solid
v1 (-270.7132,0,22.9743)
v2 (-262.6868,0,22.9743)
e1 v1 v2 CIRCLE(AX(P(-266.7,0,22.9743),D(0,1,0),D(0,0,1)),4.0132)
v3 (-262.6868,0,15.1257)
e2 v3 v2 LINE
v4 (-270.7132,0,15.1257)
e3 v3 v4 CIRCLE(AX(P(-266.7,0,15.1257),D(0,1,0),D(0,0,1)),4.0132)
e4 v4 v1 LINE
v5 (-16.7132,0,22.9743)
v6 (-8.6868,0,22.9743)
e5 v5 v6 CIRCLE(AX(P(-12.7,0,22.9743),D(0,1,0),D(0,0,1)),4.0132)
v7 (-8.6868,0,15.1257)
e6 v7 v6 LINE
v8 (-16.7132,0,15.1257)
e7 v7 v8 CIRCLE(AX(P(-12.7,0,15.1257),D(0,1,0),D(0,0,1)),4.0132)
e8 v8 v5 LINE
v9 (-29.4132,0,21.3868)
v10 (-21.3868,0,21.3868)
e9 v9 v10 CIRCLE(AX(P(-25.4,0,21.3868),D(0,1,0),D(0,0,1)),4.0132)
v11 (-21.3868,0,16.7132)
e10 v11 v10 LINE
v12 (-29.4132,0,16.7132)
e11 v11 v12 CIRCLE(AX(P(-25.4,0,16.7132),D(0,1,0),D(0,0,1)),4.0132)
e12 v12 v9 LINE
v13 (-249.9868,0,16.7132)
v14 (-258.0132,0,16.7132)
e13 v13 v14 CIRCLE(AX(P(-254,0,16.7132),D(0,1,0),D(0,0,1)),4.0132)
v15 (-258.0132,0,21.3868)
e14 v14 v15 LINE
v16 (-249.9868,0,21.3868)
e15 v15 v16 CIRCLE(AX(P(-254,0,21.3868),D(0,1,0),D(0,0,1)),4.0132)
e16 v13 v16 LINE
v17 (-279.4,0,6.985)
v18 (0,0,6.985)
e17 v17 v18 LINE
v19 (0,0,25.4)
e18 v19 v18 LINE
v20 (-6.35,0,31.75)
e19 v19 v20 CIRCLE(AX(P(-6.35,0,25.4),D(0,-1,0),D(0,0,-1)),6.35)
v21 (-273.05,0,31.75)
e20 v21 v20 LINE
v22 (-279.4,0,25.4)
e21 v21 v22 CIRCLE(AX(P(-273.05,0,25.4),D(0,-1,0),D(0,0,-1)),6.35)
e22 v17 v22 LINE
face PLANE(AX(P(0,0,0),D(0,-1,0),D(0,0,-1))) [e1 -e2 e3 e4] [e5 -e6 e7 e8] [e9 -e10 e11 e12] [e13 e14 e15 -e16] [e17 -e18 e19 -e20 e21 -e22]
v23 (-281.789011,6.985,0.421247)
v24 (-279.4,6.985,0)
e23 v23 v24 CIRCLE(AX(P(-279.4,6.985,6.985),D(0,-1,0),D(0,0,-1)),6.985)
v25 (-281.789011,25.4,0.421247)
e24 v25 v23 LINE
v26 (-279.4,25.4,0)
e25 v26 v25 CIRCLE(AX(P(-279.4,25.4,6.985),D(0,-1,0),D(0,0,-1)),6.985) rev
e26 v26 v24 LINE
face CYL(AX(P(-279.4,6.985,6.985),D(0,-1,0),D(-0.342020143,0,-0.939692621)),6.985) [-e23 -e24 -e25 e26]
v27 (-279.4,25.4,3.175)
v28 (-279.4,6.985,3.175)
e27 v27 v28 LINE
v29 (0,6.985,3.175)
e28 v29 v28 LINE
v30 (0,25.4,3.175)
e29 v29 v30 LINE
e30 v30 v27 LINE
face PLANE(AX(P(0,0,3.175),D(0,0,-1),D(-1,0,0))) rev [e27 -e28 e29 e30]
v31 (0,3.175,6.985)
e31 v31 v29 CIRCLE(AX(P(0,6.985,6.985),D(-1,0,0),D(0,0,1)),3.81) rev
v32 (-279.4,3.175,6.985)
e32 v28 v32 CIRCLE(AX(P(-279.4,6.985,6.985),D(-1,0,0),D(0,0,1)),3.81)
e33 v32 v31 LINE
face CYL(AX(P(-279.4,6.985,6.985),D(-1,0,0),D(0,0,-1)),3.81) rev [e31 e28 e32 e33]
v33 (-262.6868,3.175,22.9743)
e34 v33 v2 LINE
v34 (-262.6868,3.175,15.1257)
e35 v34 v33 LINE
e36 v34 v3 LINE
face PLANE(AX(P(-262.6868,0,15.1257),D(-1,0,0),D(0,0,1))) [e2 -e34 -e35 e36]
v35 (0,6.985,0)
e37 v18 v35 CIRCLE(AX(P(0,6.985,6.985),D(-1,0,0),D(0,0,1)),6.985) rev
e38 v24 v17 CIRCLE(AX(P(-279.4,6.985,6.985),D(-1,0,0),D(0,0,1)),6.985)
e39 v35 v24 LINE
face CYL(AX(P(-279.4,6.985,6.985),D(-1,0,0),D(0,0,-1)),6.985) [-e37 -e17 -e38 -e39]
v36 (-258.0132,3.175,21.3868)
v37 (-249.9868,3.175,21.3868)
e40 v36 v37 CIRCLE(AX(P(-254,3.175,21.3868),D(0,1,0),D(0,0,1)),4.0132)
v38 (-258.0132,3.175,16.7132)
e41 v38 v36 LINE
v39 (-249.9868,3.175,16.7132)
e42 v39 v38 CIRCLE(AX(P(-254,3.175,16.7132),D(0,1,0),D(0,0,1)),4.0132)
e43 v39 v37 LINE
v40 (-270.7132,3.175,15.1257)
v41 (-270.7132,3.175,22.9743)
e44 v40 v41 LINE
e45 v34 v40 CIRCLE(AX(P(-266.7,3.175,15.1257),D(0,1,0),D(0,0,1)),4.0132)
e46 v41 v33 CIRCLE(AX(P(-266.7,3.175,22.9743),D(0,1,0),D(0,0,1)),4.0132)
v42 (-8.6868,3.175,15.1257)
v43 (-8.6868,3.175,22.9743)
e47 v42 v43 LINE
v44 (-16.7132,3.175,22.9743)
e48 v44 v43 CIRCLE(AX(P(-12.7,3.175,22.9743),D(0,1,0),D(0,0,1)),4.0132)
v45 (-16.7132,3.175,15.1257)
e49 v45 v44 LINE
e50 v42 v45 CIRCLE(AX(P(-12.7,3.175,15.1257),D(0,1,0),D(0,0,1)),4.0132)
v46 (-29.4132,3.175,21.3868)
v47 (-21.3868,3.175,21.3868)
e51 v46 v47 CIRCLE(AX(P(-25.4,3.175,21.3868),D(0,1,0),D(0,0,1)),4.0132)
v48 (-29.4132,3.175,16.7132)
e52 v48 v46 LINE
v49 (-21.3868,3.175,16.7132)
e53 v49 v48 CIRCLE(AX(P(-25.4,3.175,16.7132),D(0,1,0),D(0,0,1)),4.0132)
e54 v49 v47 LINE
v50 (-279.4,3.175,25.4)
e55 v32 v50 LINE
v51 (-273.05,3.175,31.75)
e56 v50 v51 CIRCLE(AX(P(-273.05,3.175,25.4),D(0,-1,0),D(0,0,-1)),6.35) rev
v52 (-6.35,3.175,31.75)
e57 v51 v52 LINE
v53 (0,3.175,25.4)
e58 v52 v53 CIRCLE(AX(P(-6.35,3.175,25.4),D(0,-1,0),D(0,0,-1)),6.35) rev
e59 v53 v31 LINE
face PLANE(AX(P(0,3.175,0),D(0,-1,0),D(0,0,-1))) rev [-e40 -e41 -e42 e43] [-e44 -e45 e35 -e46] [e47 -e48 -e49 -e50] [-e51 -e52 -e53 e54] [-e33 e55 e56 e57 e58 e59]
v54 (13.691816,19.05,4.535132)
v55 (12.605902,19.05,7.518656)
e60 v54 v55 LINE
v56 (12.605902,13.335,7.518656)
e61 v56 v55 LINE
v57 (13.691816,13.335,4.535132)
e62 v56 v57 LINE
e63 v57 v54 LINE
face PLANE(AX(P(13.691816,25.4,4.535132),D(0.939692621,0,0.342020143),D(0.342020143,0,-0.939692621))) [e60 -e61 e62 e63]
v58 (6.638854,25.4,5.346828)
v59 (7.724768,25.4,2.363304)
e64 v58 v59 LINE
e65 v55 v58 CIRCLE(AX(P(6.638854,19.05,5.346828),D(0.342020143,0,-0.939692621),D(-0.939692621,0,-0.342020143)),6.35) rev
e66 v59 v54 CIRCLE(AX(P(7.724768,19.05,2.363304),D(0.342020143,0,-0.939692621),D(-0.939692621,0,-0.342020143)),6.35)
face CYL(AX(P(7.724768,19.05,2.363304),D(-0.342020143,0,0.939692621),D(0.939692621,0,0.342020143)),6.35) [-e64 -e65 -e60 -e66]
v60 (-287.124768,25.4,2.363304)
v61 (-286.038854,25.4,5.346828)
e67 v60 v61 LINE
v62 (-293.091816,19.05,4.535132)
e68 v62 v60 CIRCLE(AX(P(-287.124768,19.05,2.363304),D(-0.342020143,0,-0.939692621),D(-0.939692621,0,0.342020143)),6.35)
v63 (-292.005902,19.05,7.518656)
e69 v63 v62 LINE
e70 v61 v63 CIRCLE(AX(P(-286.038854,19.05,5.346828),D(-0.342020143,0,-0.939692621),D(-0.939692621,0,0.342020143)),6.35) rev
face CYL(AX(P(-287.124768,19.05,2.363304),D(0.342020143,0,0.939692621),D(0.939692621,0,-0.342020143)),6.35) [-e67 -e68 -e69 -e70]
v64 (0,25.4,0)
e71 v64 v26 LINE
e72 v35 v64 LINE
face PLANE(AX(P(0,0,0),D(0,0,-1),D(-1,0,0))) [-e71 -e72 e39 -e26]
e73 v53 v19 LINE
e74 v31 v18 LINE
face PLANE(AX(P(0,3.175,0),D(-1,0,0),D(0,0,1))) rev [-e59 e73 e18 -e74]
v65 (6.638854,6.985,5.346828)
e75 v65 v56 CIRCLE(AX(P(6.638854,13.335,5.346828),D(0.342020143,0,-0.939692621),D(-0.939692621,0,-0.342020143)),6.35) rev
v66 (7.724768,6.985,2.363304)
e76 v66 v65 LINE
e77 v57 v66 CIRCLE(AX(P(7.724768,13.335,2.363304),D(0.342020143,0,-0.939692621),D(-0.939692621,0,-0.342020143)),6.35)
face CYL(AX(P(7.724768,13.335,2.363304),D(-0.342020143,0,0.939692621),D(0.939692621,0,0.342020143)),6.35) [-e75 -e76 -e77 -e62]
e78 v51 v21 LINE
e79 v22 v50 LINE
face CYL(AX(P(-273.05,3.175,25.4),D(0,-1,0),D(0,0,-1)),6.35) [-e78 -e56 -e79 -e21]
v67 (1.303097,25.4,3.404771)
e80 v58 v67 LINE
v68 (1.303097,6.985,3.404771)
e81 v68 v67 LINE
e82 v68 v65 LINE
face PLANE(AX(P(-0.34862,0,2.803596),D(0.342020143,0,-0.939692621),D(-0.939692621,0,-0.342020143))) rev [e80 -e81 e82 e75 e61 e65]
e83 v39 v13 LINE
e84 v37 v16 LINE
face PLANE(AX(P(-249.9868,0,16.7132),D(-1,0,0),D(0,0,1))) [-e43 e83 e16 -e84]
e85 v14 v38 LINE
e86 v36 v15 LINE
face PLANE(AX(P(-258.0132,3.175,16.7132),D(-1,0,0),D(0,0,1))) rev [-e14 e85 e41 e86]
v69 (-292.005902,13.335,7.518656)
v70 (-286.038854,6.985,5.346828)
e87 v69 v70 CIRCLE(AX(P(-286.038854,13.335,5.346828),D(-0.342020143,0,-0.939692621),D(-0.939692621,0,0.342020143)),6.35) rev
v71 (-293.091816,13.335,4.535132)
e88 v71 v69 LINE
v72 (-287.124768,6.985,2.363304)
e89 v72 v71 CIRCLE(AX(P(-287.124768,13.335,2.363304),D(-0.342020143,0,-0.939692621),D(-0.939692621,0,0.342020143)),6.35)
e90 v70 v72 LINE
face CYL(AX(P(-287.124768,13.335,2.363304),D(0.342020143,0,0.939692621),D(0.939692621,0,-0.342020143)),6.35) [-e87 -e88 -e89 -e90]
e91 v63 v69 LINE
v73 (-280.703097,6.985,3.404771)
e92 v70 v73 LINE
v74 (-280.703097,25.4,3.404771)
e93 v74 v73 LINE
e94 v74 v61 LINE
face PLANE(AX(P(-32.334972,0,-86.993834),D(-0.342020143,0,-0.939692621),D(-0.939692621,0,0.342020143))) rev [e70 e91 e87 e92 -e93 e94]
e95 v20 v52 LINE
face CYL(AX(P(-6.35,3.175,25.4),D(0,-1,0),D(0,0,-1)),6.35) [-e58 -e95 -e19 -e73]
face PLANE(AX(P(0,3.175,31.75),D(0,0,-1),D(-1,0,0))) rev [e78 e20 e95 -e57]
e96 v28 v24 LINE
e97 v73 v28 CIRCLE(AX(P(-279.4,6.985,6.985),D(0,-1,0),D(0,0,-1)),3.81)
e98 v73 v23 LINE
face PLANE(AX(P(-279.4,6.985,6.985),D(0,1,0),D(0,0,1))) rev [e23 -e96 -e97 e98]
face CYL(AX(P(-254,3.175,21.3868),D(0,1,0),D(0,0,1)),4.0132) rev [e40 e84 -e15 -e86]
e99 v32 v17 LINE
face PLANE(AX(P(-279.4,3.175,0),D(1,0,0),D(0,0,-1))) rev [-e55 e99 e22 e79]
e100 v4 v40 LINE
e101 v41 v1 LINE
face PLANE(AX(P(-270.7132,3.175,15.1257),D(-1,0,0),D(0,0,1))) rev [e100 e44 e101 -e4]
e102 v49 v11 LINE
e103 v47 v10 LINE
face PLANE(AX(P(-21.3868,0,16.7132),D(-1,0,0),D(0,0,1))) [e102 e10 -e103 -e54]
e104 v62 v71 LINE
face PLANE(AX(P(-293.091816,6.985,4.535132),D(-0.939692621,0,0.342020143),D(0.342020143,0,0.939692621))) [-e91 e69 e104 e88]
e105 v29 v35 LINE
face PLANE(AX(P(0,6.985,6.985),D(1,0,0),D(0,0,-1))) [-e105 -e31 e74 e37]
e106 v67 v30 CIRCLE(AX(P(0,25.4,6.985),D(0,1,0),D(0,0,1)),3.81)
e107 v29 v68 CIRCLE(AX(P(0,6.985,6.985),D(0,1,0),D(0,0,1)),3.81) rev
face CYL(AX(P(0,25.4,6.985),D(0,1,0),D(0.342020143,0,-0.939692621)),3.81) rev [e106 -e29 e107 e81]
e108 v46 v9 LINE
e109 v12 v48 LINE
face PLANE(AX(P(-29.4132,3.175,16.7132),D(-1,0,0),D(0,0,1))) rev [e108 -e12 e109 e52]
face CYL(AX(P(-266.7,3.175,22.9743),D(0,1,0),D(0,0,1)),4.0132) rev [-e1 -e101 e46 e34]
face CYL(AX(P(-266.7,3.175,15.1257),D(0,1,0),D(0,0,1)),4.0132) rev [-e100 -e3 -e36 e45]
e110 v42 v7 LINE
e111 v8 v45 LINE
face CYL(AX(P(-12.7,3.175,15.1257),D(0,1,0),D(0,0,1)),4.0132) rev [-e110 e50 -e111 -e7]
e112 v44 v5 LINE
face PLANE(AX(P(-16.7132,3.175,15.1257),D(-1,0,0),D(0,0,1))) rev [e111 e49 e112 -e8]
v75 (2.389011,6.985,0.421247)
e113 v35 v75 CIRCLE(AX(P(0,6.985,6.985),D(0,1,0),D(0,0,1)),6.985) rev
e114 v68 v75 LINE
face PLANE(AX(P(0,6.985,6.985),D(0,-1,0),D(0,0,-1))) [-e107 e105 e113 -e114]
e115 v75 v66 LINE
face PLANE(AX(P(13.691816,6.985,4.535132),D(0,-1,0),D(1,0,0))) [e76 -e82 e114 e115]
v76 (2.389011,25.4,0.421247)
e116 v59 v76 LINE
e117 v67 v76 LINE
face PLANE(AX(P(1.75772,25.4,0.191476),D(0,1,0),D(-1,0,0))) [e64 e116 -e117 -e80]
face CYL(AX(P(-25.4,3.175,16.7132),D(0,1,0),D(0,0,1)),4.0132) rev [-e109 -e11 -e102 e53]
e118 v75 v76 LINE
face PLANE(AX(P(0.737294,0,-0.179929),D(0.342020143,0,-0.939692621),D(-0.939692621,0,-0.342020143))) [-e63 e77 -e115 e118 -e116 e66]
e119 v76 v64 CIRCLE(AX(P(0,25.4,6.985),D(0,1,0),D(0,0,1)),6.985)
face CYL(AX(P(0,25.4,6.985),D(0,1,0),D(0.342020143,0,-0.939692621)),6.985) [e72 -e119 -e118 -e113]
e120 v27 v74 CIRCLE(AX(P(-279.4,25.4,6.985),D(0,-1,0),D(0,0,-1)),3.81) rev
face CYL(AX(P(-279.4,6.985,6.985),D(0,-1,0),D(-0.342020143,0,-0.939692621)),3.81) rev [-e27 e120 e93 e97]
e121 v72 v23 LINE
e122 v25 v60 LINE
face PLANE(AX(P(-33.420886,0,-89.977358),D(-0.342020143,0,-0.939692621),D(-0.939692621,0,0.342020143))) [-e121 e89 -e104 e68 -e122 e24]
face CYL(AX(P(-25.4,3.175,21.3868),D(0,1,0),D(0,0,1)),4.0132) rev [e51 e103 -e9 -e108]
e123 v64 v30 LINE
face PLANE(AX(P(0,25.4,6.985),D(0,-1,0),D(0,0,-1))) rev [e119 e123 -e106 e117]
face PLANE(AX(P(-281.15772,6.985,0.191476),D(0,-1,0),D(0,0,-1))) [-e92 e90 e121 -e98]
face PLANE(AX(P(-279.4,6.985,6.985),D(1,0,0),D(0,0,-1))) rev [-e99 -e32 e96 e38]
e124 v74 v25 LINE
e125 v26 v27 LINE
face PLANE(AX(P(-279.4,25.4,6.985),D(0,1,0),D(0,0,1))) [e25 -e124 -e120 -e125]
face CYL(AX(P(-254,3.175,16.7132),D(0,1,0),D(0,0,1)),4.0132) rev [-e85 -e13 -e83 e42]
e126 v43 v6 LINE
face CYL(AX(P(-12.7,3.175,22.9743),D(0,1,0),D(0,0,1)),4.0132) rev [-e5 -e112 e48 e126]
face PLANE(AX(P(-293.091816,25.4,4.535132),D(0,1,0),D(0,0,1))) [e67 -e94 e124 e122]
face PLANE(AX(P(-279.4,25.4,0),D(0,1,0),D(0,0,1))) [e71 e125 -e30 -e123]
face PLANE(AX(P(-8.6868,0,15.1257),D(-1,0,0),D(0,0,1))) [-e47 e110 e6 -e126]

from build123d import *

# Parameters (mm, degrees)
SKETCH3_W                    = 279.4
SKETCH3_H                    = 31.75
BASE_FLANGE1_DEPTH           = 3.175
EDGE_FLANGE1_STRIP_W         = 20.32
EDGE_FLANGE1_STRIP_H         = 3.175
EDGE_FLANGE1_STRIP_CUT_DEPTH = 279.4
EDGE_FLANGE1_DEPTH           = 279.4
EDGE_FLANGE2_DEPTH           = 18.415
EDGE_FLANGE3_DEPTH           = 18.415
FILLET1_R                    = 6.35
O_0_316_DIAMETER_SLOT2_DEPTH = 3.175
O_0_316_DIAMETER_SLOT1_DEPTH = 3.175


# Read off the part's stored shape, not the designer's step: O (0.316) Diameter Slot2, O (0.316) Diameter Slot1
# Sheet-metal steps are written as plain solids
with BuildPart() as part:
    # Sketch3 → Base-Flange1 (new body)
    with BuildSketch(Plane(origin=(0, 0, 0), x_dir=(1, 0, 0), z_dir=(0, 1, 0))):
        with Locations((-139.7, -15.875)):
            Rectangle(SKETCH3_W, SKETCH3_H)
    extrude(amount=BASE_FLANGE1_DEPTH)

    # Edge-Flange1 strip (across the edge) → Edge-Flange1 strip cut (cut)
    with BuildSketch(Plane(origin=(0, 3.175, 0), x_dir=(0, 0, 1), z_dir=(-1, 0, 0))):
        with Locations((-3.175, -1.5875)):
            Rectangle(EDGE_FLANGE1_STRIP_W, EDGE_FLANGE1_STRIP_H)
    extrude(amount=EDGE_FLANGE1_STRIP_CUT_DEPTH, mode=Mode.SUBTRACT)

    # Edge-Flange1 section (across the edge) → Edge-Flange1 (add)
    with BuildSketch(Plane(origin=(0, 3.175, 0), x_dir=(0, 0, 1), z_dir=(-1, 0, 0))):
        with BuildLine():
            Line((0, 3.81), (0, 22.225))
            Line((0, 22.225), (3.175, 22.225))
            Line((3.175, 22.225), (3.175, 3.81))
            ThreePointArc((3.175, 3.81), (4.290923164, 1.115923164), (6.985, 0))
            Line((6.985, 0), (6.985, -3.175))
            ThreePointArc((6.985, -3.175), (2.045859133, -1.129140867), (0, 3.81))
        make_face()
    extrude(amount=EDGE_FLANGE1_DEPTH)

    # Edge-Flange2 section (across the edge) → Edge-Flange2 (add)
    with BuildSketch(Plane(origin=(0.671805796, 6.985, 3.175), x_dir=(-0.3420201433256631, 2.7658990361859502e-15, 0.9396926207859105), z_dir=(0, 1, 0))):
        with BuildLine():
            Line((-3.175, 0.671805796), (-3.175, 12.7))
            Line((-3.175, 12.7), (0, 12.7))
            Line((0, 12.7), (0, 0.671805796))
            ThreePointArc((0, 0.671805796), (0.057882461, 0.01020624), (0.229771115, -0.63129095))
            Line((0.229771115, -0.63129095), (-2.753752956, -1.717204905))
            ThreePointArc((-2.753752956, -1.717204905), (-3.068882155, -0.541126725), (-3.175, 0.671805796))
        make_face()
    extrude(amount=EDGE_FLANGE2_DEPTH)

    # Edge-Flange3 section (across the edge) → Edge-Flange3 (add)
    with BuildSketch(Plane(origin=(-280.071805796, 25.4, 3.175), x_dir=(0.3420201433256631, 1.2835487003775482e-15, 0.9396926207859105), z_dir=(0, -1, 0))):
        with BuildLine():
            Line((-3.175, 0.671805796), (-3.175, 12.7))
            Line((-3.175, 12.7), (0, 12.7))
            Line((0, 12.7), (0, 0.671805796))
            ThreePointArc((0, 0.671805796), (0.057882461, 0.01020624), (0.229771115, -0.63129095))
            Line((0.229771115, -0.63129095), (-2.753752956, -1.717204905))
            ThreePointArc((-2.753752956, -1.717204905), (-3.068882155, -0.541126725), (-3.175, 0.671805796))
        make_face()
    extrude(amount=EDGE_FLANGE3_DEPTH)

    # Fillet1
    fillet1_edges = [part.edges().sort_by_distance(p)[0] for p in [
        (13.148859058, 6.985, 6.026893785),
        (13.148859058, 25.4, 6.026893785),
        (-292.548859058, 25.4, 6.026893785),
        (-292.548859058, 6.985, 6.026893785),
        (0, 1.5875, 31.75),
        (-279.4, 1.5875, 31.75),
    ]]
    fillet(fillet1_edges, radius=FILLET1_R)

    # O (0.316) Diameter Slot2 outline → O (0.316) Diameter Slot2 (cut)
    with BuildSketch(Plane(origin=(0, 0, 0), x_dir=(1, 0, 0), z_dir=(0, 1, 0))):
        with BuildLine():
            Line((-29.4132, -16.7132), (-29.4132, -21.3868))
            ThreePointArc((-29.4132, -21.3868), (-25.4, -25.4), (-21.3868, -21.3868))
            Line((-21.3868, -21.3868), (-21.3868, -16.7132))
            ThreePointArc((-21.3868, -16.7132), (-25.4, -12.7), (-29.4132, -16.7132))
        make_face()
        with BuildLine():
            Line((-258.0132, -16.7132), (-258.0132, -21.3868))
            ThreePointArc((-258.0132, -21.3868), (-254, -25.4), (-249.9868, -21.3868))
            Line((-249.9868, -21.3868), (-249.9868, -16.7132))
            ThreePointArc((-249.9868, -16.7132), (-254, -12.7), (-258.0132, -16.7132))
        make_face()
    extrude(amount=O_0_316_DIAMETER_SLOT2_DEPTH, mode=Mode.SUBTRACT)

    # O (0.316) Diameter Slot1 outline → O (0.316) Diameter Slot1 (cut)
    with BuildSketch(Plane(origin=(0, 0, 0), x_dir=(1, 0, 0), z_dir=(0, 1, 0))):
        with BuildLine():
            Line((-16.7132, -15.1257), (-16.7132, -22.9743))
            ThreePointArc((-16.7132, -22.9743), (-12.7, -26.9875), (-8.6868, -22.9743))
            Line((-8.6868, -22.9743), (-8.6868, -15.1257))
            ThreePointArc((-8.6868, -15.1257), (-12.7, -11.1125), (-16.7132, -15.1257))
        make_face()
        with BuildLine():
            Line((-270.7132, -15.1257), (-270.7132, -22.9743))
            ThreePointArc((-270.7132, -22.9743), (-266.7, -26.9875), (-262.6868, -22.9743))
            Line((-262.6868, -22.9743), (-262.6868, -15.1257))
            ThreePointArc((-262.6868, -15.1257), (-266.7, -11.1125), (-270.7132, -15.1257))
        make_face()
    extrude(amount=O_0_316_DIAMETER_SLOT1_DEPTH, mode=Mode.SUBTRACT)


solid = part.part
